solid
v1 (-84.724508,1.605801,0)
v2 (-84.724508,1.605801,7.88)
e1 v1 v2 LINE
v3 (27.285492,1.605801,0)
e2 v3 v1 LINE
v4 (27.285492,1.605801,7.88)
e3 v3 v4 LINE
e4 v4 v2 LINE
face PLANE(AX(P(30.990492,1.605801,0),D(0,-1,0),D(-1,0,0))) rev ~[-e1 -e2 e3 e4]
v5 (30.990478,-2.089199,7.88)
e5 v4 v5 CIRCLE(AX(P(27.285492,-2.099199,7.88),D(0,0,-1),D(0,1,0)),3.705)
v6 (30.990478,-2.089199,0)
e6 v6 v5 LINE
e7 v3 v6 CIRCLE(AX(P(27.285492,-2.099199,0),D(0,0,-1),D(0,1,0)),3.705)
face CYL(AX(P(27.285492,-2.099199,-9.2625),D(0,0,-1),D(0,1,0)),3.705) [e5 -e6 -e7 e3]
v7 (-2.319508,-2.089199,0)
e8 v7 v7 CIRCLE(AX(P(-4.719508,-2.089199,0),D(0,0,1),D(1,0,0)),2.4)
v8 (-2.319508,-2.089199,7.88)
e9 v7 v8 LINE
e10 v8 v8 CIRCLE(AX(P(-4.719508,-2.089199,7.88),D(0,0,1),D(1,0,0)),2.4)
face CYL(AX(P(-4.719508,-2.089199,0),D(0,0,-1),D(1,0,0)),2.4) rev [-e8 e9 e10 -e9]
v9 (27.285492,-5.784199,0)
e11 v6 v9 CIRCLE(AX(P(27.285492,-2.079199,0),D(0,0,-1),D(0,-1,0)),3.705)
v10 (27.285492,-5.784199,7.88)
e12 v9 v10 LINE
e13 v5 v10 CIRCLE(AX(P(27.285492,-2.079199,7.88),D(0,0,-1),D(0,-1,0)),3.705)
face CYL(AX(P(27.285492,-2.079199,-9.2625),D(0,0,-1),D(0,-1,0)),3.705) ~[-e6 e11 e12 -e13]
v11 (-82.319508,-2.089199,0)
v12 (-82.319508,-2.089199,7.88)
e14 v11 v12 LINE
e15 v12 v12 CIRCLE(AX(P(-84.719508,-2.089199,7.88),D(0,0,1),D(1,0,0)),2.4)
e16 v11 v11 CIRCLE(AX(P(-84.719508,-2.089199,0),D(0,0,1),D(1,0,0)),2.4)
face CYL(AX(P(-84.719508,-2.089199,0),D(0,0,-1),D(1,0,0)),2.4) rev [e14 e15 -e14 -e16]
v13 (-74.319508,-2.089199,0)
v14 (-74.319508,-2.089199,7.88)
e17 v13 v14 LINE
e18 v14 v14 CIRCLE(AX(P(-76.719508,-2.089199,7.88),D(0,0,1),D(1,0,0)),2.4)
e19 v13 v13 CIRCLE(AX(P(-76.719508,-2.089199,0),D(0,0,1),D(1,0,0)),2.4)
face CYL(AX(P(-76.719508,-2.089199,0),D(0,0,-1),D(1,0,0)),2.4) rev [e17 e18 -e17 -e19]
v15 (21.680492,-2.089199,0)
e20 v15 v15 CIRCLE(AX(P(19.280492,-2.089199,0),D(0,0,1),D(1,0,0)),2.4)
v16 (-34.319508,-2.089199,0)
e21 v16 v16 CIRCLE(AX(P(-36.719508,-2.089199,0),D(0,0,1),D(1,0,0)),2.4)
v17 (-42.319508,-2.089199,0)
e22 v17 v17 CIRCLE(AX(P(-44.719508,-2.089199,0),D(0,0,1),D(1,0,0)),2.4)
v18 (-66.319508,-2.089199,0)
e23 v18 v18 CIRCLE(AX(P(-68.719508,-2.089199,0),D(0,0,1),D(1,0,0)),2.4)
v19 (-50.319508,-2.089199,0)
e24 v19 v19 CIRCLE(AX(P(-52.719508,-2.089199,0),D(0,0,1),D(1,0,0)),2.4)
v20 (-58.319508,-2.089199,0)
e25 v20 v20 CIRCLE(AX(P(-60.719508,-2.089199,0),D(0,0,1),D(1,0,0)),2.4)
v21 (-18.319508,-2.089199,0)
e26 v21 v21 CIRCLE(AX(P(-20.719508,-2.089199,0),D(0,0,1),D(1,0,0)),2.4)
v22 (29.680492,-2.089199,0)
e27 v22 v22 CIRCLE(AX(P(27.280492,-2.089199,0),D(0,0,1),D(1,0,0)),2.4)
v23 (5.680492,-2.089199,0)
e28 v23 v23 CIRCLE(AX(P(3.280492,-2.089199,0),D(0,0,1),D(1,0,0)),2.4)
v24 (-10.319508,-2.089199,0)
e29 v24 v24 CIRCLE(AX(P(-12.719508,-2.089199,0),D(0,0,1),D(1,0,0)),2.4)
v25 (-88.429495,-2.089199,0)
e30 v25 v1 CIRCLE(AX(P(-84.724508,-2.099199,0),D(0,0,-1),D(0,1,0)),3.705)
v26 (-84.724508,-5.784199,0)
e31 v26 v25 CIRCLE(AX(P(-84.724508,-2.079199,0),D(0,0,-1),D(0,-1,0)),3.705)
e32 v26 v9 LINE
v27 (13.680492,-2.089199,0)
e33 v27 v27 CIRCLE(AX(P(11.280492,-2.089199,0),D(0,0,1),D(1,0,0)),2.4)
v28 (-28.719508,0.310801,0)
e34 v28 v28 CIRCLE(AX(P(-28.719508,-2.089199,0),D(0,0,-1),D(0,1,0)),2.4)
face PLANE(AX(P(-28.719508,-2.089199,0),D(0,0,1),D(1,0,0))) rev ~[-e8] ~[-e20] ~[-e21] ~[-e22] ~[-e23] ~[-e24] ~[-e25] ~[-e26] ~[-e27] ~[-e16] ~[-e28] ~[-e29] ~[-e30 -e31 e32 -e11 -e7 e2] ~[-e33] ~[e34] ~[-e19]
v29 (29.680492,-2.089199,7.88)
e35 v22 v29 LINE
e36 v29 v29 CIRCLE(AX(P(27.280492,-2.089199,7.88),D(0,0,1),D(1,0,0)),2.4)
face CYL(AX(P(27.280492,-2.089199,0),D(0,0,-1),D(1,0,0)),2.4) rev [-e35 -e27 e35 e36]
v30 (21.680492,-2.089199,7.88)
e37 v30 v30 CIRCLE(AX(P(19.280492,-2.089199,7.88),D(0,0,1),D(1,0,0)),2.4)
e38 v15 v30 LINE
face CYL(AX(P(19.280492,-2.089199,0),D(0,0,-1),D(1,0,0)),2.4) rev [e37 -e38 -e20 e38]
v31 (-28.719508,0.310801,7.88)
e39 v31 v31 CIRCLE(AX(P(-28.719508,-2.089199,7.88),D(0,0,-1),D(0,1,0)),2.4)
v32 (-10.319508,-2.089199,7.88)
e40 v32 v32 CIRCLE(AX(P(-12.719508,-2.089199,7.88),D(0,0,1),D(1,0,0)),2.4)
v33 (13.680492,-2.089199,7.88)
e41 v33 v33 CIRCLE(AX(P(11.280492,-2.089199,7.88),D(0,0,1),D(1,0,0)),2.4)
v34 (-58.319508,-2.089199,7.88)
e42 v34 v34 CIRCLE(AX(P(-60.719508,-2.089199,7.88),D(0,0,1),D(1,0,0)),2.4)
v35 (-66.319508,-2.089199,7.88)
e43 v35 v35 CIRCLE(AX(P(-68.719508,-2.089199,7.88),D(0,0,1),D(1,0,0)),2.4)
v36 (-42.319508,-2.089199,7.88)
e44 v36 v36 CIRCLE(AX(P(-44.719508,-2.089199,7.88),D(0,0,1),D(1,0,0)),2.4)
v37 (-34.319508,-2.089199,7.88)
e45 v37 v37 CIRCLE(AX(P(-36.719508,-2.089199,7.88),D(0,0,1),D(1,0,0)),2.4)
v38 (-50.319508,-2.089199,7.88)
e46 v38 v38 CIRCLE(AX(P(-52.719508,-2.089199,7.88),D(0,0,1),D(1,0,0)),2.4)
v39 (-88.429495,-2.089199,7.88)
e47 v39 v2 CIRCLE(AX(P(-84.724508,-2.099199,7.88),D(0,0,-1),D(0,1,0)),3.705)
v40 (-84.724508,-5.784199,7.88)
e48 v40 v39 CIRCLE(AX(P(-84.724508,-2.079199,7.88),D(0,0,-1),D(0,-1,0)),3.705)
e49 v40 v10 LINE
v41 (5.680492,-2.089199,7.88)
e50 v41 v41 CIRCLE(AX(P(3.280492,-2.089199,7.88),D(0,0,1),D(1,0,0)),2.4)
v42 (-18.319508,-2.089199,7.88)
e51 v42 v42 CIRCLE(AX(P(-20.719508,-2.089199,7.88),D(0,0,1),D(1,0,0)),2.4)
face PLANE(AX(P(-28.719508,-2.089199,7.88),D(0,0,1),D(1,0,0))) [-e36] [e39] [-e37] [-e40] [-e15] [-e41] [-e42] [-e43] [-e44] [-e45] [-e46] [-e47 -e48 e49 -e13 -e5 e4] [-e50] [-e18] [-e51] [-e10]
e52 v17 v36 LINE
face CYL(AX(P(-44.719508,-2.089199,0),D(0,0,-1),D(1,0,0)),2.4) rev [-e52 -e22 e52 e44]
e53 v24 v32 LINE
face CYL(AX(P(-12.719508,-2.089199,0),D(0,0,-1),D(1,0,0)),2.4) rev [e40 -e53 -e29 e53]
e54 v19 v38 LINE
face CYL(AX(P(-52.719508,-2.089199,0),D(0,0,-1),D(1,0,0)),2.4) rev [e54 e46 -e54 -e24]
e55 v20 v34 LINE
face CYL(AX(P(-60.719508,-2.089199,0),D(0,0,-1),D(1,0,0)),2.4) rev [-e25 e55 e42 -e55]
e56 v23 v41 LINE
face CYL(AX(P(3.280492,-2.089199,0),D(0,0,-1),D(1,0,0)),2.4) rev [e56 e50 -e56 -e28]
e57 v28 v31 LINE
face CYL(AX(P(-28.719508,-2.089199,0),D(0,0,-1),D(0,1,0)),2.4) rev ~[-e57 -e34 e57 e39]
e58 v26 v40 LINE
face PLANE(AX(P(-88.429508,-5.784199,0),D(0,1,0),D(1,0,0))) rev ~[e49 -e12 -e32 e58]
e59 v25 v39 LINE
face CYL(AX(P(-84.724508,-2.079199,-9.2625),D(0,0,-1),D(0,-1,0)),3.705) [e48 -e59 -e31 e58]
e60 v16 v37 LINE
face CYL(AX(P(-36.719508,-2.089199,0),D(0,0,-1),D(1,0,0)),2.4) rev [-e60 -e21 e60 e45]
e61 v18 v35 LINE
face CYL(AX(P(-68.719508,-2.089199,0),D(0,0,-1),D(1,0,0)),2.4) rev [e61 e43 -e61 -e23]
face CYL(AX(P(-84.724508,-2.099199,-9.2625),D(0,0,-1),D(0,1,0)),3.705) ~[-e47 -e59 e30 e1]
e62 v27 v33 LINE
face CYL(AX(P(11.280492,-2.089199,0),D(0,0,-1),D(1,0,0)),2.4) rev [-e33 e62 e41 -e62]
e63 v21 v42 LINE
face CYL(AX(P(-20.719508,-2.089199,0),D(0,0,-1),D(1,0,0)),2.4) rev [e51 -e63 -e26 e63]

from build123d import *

# Parameters (mm, degrees)
F0_R        = 2.4
F1_DEPTH    = 7.88
F2_T1_DEPTH = 26.405


# Not quite as in the source:
# - a fillet or chamfer that OpenCascade refuses, or shapes differently, is made with other operations: its cross-section is extruded or revolved along the edge and cut away or added


with BuildPart() as f1:
    # F0 (on Top) → F1 (new body)
    with BuildSketch(Plane.XY):
        Polygon((30.9904916829, 1.6058013724), (-28.7195083171, 1.6058013724), (-88.4295083171, 1.6058013724), (-88.4295083171, -2.0891986276), (-88.4295083171, -5.7841986276), (-28.7195083171, -5.7841986276), (30.9904916829, -5.7841986276), (30.9904916829, -2.0891986276), align=None)
        with Locations((-84.7195083171, -2.0891986276)):
            Circle(F0_R, mode=Mode.SUBTRACT)
        with Locations((-76.7195083171, -2.0891986276)):
            Circle(F0_R, mode=Mode.SUBTRACT)
        with Locations((-68.7195083171, -2.0891986276)):
            Circle(F0_R, mode=Mode.SUBTRACT)
        with Locations((-60.7195083171, -2.0891986276)):
            Circle(F0_R, mode=Mode.SUBTRACT)
        with Locations((-52.7195083171, -2.0891986276)):
            Circle(F0_R, mode=Mode.SUBTRACT)
        with Locations((-44.7195083171, -2.0891986276)):
            Circle(F0_R, mode=Mode.SUBTRACT)
        with Locations((-36.7195083171, -2.0891986276)):
            Circle(F0_R, mode=Mode.SUBTRACT)
        with BuildLine():
            ThreePointArc((-28.7195083171, -4.4891986276), (-31.1195083171, -2.0891986276), (-28.7195083171, 0.3108013724))
            ThreePointArc((-28.7195083171, 0.3108013724), (-26.3195083171, -2.0891986276), (-28.7195083171, -4.4891986276))
        make_face(mode=Mode.SUBTRACT)
        with Locations((-20.7195083171, -2.0891986276)):
            Circle(F0_R, mode=Mode.SUBTRACT)
        with Locations((-12.7195083171, -2.0891986276)):
            Circle(F0_R, mode=Mode.SUBTRACT)
        with Locations((-4.7195083171, -2.0891986276)):
            Circle(F0_R, mode=Mode.SUBTRACT)
        with Locations((3.2804916829, -2.0891986276)):
            Circle(F0_R, mode=Mode.SUBTRACT)
        with Locations((11.2804916829, -2.0891986276)):
            Circle(F0_R, mode=Mode.SUBTRACT)
        with Locations((19.2804916829, -2.0891986276)):
            Circle(F0_R, mode=Mode.SUBTRACT)
        with Locations((27.2804916829, -2.0891986276)):
            Circle(F0_R, mode=Mode.SUBTRACT)
    extrude(amount=F1_DEPTH)

    # F2: fillet of radius 3.705 on 4 edges, made by hand

    # F2_s2 → F2_t1 (cut)
    with BuildSketch(Plane.XY.offset(-9.2625)):
        with BuildLine():
            ThreePointArc((27.2854916829, 1.6058013724), (29.9053223072, 0.5206319967), (30.9904916829, -2.0991986276))
            Line((30.9904916829, -2.0991986276), (30.9904916829, 1.6058013724))
            Line((30.9904916829, 1.6058013724), (27.2854916829, 1.6058013724))
        make_face()
        with BuildLine():
            ThreePointArc((27.2854916829, -5.7841986276), (29.9053223072, -4.6990292519), (30.9904916829, -2.0791986276))
            Line((30.9904916829, -2.0791986276), (30.9904916829, -5.7841986276))
            Line((30.9904916829, -5.7841986276), (27.2854916829, -5.7841986276))
        make_face()
        with BuildLine():
            ThreePointArc((-84.7245083171, 1.6058013724), (-87.3443389413, 0.5206319967), (-88.4295083171, -2.0991986276))
            Line((-88.4295083171, -2.0991986276), (-88.4295083171, 1.6058013724))
            Line((-88.4295083171, 1.6058013724), (-84.7245083171, 1.6058013724))
        make_face()
        with BuildLine():
            ThreePointArc((-84.7245083171, -5.7841986276), (-87.3443389413, -4.6990292519), (-88.4295083171, -2.0791986276))
            Line((-88.4295083171, -2.0791986276), (-88.4295083171, -5.7841986276))
            Line((-88.4295083171, -5.7841986276), (-84.7245083171, -5.7841986276))
        make_face()
    extrude(amount=F2_T1_DEPTH, mode=Mode.SUBTRACT)


solid = f1.part
